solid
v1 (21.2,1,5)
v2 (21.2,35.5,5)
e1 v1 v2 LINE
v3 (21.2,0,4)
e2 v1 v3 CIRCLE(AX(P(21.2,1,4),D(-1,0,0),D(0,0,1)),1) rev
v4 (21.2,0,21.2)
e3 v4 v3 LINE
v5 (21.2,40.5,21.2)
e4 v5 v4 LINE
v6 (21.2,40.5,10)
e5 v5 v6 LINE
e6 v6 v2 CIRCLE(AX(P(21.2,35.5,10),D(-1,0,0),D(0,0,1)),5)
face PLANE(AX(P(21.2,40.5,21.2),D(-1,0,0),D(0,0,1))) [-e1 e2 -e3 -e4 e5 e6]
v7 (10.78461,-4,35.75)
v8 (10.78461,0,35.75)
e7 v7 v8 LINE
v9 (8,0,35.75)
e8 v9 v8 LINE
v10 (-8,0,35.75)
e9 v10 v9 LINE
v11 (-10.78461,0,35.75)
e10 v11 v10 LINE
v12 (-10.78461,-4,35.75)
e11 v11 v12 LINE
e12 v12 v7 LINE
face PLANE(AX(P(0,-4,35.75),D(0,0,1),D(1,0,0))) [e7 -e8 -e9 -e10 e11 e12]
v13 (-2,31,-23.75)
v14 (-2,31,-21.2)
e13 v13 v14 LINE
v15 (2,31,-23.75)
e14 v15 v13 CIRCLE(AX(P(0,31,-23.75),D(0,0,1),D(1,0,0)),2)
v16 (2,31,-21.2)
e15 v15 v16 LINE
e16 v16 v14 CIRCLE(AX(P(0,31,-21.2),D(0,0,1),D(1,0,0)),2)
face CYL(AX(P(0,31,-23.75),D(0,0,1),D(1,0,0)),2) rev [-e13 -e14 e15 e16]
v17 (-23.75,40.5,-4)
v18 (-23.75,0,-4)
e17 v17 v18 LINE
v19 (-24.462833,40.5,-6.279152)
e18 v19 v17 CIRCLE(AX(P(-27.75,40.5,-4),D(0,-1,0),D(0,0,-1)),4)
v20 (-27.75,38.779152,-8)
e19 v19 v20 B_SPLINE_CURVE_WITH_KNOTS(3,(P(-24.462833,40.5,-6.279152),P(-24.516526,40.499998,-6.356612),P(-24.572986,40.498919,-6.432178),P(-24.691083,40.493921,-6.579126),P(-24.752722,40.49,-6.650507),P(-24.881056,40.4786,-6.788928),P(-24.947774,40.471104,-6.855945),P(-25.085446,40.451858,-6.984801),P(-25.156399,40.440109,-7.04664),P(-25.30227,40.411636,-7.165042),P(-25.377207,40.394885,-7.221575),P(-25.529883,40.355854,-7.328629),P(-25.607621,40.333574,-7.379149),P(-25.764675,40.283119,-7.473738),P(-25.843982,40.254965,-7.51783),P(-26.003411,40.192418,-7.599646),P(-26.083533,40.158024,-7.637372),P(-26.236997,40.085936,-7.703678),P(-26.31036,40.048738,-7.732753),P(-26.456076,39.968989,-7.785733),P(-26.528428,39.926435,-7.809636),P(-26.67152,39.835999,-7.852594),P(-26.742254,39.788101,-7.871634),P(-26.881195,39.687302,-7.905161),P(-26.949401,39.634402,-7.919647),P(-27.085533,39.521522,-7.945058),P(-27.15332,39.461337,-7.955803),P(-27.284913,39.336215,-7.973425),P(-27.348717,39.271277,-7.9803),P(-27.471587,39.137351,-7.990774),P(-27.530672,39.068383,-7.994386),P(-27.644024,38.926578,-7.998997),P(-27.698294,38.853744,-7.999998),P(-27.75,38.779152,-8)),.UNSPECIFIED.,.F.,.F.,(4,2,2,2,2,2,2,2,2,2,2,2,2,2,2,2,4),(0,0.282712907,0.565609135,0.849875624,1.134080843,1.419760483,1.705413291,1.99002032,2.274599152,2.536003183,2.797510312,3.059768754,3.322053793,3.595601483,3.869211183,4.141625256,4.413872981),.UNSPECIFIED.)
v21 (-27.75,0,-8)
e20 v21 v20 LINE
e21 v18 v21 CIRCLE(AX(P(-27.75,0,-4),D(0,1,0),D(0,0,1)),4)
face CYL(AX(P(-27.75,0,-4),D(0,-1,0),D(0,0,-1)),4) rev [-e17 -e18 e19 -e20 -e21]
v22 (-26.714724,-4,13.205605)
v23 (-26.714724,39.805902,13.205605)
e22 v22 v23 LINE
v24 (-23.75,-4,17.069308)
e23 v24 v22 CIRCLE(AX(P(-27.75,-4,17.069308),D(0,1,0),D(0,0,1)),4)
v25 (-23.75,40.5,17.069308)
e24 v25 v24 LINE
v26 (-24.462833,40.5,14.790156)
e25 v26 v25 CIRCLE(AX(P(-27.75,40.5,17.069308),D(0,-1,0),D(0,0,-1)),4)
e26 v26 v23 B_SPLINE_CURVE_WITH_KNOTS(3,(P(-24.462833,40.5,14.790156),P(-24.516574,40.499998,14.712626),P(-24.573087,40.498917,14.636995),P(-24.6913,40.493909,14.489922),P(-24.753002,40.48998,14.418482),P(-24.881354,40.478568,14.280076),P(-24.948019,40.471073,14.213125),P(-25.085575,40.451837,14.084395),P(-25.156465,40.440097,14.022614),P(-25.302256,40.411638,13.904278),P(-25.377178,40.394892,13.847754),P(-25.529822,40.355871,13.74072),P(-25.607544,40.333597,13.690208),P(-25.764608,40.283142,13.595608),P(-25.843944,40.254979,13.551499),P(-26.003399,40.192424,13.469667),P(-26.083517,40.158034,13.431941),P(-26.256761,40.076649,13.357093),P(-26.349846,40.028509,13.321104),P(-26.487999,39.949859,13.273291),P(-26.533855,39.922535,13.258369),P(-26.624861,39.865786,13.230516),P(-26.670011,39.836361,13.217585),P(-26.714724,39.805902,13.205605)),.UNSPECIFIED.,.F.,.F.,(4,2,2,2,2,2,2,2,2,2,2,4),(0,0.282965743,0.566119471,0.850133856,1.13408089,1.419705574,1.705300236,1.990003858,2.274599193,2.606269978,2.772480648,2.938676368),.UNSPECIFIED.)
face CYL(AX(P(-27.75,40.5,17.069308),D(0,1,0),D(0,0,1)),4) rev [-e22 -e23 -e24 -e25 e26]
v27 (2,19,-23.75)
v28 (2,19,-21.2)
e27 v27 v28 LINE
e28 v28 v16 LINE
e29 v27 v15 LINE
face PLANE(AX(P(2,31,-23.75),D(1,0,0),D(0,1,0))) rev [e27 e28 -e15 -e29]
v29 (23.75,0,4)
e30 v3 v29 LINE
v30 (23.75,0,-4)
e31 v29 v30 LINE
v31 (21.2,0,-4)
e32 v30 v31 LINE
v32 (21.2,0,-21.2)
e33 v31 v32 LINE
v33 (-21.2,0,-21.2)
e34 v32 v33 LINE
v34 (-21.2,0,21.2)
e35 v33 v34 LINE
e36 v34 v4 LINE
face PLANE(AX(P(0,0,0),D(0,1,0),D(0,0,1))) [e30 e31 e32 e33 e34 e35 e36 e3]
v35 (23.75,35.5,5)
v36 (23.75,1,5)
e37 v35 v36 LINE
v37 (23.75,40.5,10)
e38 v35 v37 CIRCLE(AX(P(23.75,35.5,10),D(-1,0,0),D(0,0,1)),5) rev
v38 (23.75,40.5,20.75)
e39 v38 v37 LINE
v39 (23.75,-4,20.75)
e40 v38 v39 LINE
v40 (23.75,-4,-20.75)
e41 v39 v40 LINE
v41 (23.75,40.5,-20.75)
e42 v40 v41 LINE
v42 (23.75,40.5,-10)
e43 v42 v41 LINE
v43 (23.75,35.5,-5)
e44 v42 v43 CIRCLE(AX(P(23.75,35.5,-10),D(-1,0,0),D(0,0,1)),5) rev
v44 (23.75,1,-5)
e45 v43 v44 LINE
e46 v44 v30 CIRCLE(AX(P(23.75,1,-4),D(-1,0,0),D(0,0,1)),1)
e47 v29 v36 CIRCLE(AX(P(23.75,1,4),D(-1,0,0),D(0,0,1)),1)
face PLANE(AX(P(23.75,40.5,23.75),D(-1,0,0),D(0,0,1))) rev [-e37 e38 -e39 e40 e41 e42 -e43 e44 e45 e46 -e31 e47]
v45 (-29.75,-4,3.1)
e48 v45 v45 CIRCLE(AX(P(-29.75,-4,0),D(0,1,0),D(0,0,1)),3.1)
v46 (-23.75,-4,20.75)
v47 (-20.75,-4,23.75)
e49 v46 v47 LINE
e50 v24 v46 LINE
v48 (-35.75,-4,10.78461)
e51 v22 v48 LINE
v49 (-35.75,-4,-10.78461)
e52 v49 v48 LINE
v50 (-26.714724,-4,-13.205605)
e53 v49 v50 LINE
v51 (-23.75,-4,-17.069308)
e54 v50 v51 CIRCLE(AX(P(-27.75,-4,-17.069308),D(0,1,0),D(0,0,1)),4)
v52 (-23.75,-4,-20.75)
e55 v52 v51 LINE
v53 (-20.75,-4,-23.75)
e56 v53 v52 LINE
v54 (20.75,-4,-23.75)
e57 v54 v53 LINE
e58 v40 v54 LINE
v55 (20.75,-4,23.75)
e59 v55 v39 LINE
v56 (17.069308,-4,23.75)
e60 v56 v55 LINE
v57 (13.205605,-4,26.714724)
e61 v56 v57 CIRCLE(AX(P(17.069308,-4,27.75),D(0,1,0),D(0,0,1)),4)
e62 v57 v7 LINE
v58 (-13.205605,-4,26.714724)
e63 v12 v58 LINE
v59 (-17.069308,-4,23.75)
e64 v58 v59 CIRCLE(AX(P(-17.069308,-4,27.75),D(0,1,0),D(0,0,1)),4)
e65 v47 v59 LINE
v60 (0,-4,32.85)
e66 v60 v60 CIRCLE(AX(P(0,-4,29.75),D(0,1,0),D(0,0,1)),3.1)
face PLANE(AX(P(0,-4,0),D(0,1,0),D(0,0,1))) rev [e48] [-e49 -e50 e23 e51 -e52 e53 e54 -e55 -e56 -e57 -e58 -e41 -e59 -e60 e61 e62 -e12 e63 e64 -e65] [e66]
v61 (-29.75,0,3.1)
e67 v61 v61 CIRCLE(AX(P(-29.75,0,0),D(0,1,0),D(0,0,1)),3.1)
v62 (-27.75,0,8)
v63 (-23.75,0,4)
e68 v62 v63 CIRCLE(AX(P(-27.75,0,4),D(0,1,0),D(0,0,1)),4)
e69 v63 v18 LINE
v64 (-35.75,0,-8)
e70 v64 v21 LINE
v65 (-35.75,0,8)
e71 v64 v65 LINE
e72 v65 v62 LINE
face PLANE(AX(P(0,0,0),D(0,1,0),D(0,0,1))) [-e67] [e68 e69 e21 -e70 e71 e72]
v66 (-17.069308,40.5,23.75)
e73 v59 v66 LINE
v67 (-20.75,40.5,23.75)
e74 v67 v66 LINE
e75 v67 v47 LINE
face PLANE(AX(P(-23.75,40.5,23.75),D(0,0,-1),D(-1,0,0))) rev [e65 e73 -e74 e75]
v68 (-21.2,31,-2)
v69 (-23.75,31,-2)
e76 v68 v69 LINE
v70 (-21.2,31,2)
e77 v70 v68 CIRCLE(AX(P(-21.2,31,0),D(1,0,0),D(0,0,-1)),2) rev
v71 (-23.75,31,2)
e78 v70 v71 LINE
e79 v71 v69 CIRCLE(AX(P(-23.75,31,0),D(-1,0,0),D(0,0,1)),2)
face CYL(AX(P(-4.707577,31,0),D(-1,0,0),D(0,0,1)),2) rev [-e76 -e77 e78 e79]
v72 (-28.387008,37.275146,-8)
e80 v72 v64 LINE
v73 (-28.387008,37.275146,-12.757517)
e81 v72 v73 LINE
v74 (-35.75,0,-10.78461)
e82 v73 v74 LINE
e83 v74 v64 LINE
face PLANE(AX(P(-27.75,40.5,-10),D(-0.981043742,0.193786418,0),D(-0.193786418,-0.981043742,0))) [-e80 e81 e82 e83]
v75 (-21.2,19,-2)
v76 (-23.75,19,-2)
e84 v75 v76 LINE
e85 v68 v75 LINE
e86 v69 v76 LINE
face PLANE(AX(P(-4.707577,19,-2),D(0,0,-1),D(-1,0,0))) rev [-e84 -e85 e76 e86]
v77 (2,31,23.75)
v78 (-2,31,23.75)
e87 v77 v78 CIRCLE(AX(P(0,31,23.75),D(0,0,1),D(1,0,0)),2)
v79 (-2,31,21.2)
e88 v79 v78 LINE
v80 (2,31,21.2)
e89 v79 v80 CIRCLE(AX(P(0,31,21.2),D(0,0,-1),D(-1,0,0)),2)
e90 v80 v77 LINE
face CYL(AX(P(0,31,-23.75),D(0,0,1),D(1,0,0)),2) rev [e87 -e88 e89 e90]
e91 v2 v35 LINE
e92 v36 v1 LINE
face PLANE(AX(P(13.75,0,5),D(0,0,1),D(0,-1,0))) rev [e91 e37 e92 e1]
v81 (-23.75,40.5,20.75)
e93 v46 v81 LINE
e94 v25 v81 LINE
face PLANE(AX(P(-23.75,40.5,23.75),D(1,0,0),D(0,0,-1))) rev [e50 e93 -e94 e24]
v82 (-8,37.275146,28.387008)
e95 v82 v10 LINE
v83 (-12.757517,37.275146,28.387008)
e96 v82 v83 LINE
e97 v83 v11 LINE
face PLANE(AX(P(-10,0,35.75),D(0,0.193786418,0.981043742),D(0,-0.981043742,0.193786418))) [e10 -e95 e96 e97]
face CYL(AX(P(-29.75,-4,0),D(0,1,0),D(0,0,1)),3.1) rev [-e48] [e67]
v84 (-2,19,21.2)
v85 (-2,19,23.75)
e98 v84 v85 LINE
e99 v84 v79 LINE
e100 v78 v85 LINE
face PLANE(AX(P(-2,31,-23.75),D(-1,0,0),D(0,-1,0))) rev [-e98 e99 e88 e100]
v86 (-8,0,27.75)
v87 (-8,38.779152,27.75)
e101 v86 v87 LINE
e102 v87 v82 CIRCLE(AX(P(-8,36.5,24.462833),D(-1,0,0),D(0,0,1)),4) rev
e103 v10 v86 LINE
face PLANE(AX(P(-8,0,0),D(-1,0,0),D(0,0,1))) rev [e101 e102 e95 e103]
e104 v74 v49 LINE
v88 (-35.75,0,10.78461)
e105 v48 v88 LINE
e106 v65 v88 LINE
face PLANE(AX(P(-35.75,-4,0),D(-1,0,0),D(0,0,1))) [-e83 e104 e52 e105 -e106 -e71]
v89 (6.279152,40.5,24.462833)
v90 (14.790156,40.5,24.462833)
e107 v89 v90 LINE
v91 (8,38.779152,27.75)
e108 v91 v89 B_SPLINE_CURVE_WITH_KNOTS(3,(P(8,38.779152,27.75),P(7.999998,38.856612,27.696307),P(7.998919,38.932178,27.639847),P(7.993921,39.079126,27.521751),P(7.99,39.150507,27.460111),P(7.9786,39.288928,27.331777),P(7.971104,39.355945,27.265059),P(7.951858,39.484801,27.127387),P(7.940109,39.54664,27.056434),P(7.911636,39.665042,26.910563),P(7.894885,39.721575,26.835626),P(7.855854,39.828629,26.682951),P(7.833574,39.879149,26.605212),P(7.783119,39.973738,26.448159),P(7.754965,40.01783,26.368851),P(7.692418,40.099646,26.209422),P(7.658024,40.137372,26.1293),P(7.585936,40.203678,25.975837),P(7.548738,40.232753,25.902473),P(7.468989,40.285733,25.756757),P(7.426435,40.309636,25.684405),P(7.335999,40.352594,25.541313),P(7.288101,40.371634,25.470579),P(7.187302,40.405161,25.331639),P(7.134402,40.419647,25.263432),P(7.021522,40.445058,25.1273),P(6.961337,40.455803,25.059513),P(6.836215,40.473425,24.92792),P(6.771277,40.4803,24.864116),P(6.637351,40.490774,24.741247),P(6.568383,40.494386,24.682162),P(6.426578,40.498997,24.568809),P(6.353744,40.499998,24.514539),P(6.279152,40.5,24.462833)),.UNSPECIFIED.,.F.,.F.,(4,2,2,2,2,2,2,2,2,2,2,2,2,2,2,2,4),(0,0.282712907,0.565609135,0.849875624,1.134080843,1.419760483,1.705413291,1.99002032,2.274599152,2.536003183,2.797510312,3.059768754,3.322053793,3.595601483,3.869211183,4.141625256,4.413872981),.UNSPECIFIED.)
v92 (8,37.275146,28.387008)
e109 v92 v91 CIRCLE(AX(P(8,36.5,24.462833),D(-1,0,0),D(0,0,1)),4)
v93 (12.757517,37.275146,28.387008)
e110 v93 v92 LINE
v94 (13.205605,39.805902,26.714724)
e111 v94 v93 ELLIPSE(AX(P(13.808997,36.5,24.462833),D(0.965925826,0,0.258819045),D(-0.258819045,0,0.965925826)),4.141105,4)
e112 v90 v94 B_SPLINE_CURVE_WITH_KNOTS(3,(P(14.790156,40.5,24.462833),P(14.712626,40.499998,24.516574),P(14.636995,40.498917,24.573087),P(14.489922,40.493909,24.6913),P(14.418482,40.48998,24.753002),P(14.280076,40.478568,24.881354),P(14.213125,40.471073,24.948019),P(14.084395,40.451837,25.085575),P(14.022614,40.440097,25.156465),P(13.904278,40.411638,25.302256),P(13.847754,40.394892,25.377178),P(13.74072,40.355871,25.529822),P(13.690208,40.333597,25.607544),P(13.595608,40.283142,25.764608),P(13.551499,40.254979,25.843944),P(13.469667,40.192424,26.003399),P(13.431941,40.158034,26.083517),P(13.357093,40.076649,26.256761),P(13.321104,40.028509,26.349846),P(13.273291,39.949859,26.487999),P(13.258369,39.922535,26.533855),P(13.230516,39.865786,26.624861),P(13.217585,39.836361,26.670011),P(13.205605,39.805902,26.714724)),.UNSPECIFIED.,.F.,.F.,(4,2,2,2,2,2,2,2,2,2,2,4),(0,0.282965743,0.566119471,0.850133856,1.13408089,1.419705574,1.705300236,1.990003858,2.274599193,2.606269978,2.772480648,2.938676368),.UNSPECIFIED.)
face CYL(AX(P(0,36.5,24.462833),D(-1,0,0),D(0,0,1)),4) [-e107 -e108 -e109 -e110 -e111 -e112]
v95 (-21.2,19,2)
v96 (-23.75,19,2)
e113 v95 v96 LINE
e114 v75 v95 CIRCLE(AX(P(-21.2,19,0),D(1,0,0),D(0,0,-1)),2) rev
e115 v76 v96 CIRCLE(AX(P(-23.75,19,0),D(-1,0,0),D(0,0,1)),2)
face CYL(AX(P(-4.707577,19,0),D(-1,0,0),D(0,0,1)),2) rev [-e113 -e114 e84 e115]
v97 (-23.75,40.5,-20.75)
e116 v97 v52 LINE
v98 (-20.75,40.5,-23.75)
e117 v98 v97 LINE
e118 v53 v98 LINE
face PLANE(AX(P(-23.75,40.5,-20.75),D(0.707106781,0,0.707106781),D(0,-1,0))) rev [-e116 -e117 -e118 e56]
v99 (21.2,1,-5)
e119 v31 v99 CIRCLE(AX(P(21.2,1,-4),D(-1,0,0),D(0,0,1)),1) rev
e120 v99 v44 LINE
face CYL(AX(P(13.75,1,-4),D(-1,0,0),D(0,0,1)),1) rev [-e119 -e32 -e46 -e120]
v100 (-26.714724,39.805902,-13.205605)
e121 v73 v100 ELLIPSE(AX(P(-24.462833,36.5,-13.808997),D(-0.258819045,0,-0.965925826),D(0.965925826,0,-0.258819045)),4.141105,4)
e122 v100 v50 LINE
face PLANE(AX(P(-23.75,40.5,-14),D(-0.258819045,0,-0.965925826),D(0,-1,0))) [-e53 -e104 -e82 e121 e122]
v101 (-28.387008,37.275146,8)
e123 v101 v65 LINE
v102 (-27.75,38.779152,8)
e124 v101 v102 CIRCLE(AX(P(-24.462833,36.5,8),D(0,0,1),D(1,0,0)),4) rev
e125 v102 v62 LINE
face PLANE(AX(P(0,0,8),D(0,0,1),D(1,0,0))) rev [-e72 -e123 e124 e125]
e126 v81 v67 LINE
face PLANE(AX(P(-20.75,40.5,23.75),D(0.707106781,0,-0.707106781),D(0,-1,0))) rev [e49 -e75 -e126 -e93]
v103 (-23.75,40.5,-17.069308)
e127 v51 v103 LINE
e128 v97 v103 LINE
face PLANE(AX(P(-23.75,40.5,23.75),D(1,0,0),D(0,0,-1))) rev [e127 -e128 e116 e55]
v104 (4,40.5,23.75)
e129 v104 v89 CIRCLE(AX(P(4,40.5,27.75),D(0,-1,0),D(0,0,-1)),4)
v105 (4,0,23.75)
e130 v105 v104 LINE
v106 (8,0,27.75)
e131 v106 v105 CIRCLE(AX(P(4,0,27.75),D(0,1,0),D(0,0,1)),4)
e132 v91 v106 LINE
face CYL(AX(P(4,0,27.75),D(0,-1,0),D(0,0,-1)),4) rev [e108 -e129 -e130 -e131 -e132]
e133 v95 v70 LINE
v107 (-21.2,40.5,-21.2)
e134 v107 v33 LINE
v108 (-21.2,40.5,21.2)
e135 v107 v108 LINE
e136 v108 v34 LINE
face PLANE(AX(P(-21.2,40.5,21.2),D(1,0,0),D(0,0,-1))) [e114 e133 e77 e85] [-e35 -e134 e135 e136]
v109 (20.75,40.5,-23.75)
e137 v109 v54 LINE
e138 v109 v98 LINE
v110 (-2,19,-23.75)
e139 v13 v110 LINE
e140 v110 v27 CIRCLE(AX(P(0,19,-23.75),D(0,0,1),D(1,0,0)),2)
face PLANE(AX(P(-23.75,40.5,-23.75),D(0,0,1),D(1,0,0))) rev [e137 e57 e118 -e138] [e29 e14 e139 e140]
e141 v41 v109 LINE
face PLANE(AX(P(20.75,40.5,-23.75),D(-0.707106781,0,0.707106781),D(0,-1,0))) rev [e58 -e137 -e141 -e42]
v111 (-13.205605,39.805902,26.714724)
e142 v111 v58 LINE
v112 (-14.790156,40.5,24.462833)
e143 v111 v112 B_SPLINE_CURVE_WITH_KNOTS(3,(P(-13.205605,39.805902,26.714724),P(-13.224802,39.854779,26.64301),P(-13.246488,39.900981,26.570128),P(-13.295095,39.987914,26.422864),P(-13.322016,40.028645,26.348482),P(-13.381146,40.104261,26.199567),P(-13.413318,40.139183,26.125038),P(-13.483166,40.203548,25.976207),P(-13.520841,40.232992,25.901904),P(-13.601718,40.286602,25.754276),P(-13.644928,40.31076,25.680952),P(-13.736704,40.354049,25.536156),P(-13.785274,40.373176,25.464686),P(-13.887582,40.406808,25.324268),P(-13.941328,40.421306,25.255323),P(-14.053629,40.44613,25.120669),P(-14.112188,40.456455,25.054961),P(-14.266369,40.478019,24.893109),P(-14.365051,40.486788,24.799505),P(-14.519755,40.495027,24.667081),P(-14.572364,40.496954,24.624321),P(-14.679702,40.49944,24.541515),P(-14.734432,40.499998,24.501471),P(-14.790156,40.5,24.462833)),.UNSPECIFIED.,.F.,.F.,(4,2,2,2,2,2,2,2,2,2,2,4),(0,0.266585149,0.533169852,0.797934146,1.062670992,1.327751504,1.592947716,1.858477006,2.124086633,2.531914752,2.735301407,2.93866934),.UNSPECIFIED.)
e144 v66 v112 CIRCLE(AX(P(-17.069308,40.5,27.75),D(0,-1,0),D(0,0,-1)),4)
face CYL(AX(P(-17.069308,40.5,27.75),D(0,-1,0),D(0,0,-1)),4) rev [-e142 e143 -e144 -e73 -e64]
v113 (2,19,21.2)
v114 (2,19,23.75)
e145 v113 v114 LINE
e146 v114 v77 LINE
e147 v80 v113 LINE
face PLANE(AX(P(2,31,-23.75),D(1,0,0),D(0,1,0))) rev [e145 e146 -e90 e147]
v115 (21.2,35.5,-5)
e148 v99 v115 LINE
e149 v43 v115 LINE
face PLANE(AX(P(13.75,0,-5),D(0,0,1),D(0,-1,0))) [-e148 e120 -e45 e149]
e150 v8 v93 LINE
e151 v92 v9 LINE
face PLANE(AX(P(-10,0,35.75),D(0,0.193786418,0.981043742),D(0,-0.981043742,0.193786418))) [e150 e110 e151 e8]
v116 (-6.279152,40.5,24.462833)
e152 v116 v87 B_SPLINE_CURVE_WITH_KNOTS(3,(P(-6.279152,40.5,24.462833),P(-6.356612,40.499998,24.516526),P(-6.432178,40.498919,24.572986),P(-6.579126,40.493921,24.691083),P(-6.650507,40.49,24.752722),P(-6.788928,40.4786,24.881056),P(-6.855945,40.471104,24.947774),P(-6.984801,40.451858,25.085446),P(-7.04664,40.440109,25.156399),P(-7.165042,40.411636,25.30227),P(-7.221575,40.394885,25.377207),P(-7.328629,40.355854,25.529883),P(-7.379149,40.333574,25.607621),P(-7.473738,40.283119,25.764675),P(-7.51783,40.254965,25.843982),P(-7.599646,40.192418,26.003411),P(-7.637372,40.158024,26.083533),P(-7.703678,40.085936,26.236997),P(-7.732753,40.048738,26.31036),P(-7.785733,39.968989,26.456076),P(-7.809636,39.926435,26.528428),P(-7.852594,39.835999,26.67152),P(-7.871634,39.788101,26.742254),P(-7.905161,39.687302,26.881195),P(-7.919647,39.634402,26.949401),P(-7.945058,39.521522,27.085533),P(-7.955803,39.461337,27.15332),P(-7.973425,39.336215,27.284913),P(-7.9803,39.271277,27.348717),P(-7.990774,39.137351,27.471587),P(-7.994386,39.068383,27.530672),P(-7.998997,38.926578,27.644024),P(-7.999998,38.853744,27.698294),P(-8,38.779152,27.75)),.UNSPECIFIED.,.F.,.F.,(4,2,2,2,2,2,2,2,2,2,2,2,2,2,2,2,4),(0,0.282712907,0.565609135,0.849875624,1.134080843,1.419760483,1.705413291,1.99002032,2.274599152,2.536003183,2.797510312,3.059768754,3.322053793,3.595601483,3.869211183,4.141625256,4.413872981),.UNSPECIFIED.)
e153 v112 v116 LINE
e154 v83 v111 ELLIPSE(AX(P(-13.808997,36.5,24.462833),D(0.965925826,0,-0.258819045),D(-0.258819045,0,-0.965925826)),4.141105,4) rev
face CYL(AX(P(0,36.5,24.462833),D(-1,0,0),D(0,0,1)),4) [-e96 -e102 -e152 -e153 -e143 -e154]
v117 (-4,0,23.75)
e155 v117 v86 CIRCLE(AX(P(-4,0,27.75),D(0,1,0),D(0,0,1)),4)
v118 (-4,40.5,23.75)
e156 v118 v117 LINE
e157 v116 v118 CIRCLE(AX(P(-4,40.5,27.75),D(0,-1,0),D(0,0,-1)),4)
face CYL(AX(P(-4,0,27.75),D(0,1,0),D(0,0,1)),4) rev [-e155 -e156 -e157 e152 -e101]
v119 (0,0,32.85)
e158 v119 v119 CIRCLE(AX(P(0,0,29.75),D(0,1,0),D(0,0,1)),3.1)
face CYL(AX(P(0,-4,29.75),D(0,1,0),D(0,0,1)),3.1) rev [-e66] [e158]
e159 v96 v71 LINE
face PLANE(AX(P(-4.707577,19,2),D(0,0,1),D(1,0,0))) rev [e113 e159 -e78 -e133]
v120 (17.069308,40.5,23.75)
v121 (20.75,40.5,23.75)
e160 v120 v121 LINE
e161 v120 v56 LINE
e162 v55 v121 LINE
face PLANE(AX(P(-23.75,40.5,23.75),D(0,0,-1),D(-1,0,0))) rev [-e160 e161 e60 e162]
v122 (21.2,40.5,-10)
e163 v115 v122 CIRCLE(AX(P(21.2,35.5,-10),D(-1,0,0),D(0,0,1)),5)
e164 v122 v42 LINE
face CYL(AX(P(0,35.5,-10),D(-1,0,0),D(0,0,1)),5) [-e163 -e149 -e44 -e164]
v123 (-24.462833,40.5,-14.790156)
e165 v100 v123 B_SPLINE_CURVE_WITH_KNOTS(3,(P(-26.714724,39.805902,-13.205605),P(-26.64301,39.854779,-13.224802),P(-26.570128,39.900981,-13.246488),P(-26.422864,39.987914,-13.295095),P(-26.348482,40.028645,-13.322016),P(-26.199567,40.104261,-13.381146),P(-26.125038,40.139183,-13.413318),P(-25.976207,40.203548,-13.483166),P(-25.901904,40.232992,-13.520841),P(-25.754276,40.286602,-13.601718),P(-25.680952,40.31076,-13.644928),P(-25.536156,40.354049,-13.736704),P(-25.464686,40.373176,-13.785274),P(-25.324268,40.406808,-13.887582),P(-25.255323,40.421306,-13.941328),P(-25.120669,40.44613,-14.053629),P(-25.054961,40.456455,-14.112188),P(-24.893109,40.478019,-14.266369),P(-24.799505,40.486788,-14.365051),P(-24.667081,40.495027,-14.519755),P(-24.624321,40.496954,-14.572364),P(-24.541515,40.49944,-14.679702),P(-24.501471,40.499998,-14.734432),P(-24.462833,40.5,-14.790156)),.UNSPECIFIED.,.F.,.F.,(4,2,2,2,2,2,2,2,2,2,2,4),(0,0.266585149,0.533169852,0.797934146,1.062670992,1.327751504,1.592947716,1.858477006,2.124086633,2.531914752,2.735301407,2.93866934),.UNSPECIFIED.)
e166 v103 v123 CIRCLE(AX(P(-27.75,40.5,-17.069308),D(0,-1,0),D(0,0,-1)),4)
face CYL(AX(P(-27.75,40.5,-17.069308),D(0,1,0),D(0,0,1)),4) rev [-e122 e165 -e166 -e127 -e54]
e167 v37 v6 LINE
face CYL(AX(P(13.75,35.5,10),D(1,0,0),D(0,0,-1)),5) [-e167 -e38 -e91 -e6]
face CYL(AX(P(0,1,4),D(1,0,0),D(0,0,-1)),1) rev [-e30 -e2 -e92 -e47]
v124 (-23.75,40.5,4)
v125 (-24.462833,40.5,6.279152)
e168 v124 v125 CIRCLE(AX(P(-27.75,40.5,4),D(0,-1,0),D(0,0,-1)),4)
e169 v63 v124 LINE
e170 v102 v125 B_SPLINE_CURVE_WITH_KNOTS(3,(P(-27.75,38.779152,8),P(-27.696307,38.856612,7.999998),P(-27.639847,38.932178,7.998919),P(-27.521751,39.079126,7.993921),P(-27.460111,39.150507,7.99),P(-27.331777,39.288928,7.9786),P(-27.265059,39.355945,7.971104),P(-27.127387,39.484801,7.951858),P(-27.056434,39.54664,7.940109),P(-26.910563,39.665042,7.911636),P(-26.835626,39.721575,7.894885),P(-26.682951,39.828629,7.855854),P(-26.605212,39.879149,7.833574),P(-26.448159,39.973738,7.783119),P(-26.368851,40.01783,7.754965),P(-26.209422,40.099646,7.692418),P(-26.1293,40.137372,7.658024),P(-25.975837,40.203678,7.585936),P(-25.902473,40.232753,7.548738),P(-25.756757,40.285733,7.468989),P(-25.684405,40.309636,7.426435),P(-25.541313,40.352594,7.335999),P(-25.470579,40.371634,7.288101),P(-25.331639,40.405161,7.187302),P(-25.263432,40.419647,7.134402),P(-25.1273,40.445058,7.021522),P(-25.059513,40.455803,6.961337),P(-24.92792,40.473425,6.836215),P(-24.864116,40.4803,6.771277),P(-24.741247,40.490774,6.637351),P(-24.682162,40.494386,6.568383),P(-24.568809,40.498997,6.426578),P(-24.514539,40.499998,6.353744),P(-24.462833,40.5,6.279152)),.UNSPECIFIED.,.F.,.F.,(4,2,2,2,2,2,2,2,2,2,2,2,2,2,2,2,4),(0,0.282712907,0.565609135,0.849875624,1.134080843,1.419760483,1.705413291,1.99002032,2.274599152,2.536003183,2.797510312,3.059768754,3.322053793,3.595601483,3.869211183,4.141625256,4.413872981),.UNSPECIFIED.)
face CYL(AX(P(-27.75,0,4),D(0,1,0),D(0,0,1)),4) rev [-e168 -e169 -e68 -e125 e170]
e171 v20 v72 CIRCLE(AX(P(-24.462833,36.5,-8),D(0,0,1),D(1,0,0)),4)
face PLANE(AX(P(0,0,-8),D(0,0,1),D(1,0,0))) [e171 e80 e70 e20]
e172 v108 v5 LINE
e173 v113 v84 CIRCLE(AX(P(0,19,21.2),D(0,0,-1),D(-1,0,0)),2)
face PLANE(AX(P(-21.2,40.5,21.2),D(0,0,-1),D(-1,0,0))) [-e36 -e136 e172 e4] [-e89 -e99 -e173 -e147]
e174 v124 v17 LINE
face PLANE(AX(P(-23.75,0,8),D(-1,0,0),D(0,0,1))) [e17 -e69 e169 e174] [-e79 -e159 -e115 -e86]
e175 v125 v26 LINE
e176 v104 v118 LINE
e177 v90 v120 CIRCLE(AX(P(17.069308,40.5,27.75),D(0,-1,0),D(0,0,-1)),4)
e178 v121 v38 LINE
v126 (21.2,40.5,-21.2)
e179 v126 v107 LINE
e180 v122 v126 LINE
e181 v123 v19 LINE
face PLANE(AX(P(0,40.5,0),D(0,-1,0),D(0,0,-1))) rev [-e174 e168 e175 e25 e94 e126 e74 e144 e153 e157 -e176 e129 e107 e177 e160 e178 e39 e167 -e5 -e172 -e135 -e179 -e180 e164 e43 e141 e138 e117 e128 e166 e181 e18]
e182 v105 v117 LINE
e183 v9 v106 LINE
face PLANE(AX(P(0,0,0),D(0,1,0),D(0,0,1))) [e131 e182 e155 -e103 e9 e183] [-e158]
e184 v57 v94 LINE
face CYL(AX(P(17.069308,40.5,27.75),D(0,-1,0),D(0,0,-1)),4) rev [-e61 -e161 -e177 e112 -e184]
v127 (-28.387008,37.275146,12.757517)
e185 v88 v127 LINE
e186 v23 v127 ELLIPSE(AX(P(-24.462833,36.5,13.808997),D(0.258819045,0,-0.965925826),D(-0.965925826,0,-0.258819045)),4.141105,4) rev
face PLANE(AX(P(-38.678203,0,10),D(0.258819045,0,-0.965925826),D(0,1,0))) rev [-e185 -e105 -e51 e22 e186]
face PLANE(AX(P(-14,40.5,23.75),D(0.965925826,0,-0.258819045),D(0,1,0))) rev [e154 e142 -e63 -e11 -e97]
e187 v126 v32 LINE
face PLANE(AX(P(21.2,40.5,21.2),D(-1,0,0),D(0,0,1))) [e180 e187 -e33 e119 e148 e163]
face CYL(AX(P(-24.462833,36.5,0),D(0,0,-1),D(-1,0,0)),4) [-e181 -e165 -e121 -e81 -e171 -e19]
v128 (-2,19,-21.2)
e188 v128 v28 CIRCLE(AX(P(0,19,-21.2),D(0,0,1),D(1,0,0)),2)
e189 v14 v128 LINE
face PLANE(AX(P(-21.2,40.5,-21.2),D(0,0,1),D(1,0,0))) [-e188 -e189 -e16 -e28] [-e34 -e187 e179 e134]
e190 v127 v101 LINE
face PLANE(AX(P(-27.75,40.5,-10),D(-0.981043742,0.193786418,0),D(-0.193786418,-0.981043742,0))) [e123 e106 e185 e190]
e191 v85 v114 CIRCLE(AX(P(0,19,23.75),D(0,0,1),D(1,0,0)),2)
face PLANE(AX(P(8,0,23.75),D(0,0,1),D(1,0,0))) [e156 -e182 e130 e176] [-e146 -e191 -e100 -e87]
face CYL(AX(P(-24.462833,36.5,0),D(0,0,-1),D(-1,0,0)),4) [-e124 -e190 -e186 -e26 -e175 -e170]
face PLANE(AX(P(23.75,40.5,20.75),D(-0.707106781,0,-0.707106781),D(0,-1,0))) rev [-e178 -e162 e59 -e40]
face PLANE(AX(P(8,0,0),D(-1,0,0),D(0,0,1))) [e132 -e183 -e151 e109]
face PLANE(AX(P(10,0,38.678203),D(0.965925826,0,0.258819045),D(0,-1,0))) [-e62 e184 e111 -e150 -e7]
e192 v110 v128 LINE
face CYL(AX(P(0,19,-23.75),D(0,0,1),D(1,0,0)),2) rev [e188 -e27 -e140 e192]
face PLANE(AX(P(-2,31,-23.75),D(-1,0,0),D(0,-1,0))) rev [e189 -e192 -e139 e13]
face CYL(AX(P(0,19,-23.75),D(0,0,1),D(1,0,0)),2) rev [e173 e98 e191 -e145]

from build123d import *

# Parameters (mm, degrees)
SKETCH1_W                = 47.5
SKETCH1_H                = 47.5
SKETCH1_W_2              = 42.4
SKETCH1_H_2              = 42.4
BOSS_EXTRUDE1_DEPTH      = 40.5
FILLET1_SIZE             = 3
BOSS_EXTRUDE3_DEPTH      = 10
BOSS_EXTRUDE3_DEPTH_BACK = 10
CUT_EXTRUDE1_DEPTH       = 8
CUT_EXTRUDE1_DEPTH_BACK  = 8
BOSS_EXTRUDE4_DEPTH      = 10
BOSS_EXTRUDE4_DEPTH_BACK = 10
CUT_EXTRUDE2_DEPTH       = 8
CUT_EXTRUDE2_DEPTH_BACK  = 8
BOSS_EXTRUDE6_DEPTH      = 4
SKETCH10_R               = 3.1
CUT_EXTRUDE3_DEPTH       = 65.779433465
SKETCH11_R               = 3.1
CUT_EXTRUDE4_DEPTH       = 65.779433465
SKETCH14_W               = 5
SKETCH14_H               = 40.5
CUT_EXTRUDE6_DEPTH       = 10
FILLET9_R                = 5
FILLET10_R               = 1
CUT_EXTRUDE7_DEPTH       = 2.55
CUT_EXTRUDE8_DEPTH       = 72.93443195
CHAMFER1_SIZE            = 4
CHAMFER1_SIZE_2          = 14.92820323
CHAMFER2_SIZE            = 4
CHAMFER2_SIZE_2          = 14.92820323
CHAMFER3_SIZE            = 4
CHAMFER3_SIZE_2          = 14.92820323
FILLET16_R               = 4
FILLET17_R               = 4


with BuildPart() as part:
    # Sketch1 → Boss-Extrude1 (new body)
    with BuildSketch(Plane(origin=(0, 0, 0), x_dir=(1, 0, 0), z_dir=(0, 1, 0))):
        Rectangle(SKETCH1_W, SKETCH1_H)
        Rectangle(SKETCH1_W_2, SKETCH1_H_2, mode=Mode.SUBTRACT)
    extrude(amount=BOSS_EXTRUDE1_DEPTH)

    # Fillet1
    fillet1_edges = [part.edges().sort_by_distance(p)[0] for p in [
        (23.75, 20.25, 23.75),
        (-23.75, 20.25, 23.75),
        (-23.75, 20.25, -23.75),
        (23.75, 20.25, -23.75),
    ]]
    chamfer(fillet1_edges, length=FILLET1_SIZE)

    # Sketch3 → Boss-Extrude3 (add, two sides: drawn at the far end of the back side and taken through both)
    with BuildSketch(Plane.XY.offset(-BOSS_EXTRUDE3_DEPTH_BACK)):
        Polygon((-23.75, 0), (-23.75, 40.5), (-27.75, 40.5), (-35.75, 0), align=None)
    extrude(amount=BOSS_EXTRUDE3_DEPTH + BOSS_EXTRUDE3_DEPTH_BACK)

    # Sketch4 → Cut-Extrude1 (cut, two sides: drawn at the far end of the back side and taken through both)
    with BuildSketch(Plane.XY.offset(-CUT_EXTRUDE1_DEPTH_BACK)):
        Polygon((-35.75, 0), (-23.75, 0), (-23.75, 40.5), (-27.75, 40.5), align=None)
    extrude(amount=CUT_EXTRUDE1_DEPTH + CUT_EXTRUDE1_DEPTH_BACK, mode=Mode.SUBTRACT)

    # Sketch7 → Boss-Extrude4 (add, two sides: drawn at the far end of the back side and taken through both)
    with BuildSketch(Plane(origin=(0, 0, 0), x_dir=(0, 0, -1), z_dir=(1, 0, 0)).offset(-BOSS_EXTRUDE4_DEPTH_BACK)):
        Polygon((-35.75, 0), (-23.75, 0), (-23.75, 40.5), (-27.75, 40.5), align=None)
    extrude(amount=BOSS_EXTRUDE4_DEPTH + BOSS_EXTRUDE4_DEPTH_BACK)

    # Sketch8 → Cut-Extrude2 (cut, two sides: drawn at the far end of the back side and taken through both)
    with BuildSketch(Plane(origin=(0, 0, 0), x_dir=(0, 0, -1), z_dir=(1, 0, 0)).offset(-CUT_EXTRUDE2_DEPTH_BACK)):
        Polygon((-23.75, 0), (-23.75, 40.5), (-27.75, 40.5), (-35.75, 0), align=None)
    extrude(amount=CUT_EXTRUDE2_DEPTH + CUT_EXTRUDE2_DEPTH_BACK, mode=Mode.SUBTRACT)

    # Sketch9 → Boss-Extrude6 (add)
    with BuildSketch(Plane(origin=(0, 0, 0), x_dir=(1, 0, 0), z_dir=(0, 1, 0))):
        Polygon((-35.75, -10), (-23.75, -10), (-23.75, -20.75), (-20.75, -23.75), (-10, -23.75), (-10, -35.75), (10, -35.75), (10, -23.75), (20.75, -23.75), (23.75, -20.75), (23.75, 20.75), (20.75, 23.75), (-20.75, 23.75), (-23.75, 20.75), (-23.75, 10), (-35.75, 10), align=None)
    extrude(amount=-BOSS_EXTRUDE6_DEPTH)

    # Sketch10 → Cut-Extrude3 (cut, through all)
    with BuildSketch(Plane(origin=(0, 0, 0), x_dir=(1, 0, 0), z_dir=(0, 1, 0))):
        with Locations(Location((-29.75, 0, 0), (0, 0, 270))):
            Circle(SKETCH10_R)
    extrude(amount=-CUT_EXTRUDE3_DEPTH, mode=Mode.SUBTRACT)

    # Sketch11 → Cut-Extrude4 (cut, through all)
    with BuildSketch(Plane(origin=(0, 0, 0), x_dir=(1, 0, 0), z_dir=(0, 1, 0))):
        with Locations(Location((0, -29.75, 0), (0, 0, 270))):
            Circle(SKETCH11_R)
    extrude(amount=-CUT_EXTRUDE4_DEPTH, mode=Mode.SUBTRACT)

    # Sketch14 → Cut-Extrude6 (cut)
    with BuildSketch(Plane(origin=(23.75, 0, 0), x_dir=(0, 0, -1), z_dir=(1, 0, 0))):
        with Locations((-2.5, 20.25)):
            Rectangle(SKETCH14_W, SKETCH14_H)
        with Locations((2.5, 20.25)):
            Rectangle(SKETCH14_W, SKETCH14_H)
    extrude(amount=-CUT_EXTRUDE6_DEPTH, mode=Mode.SUBTRACT)

    # Fillet9
    fillet9_edges = [part.edges().sort_by_distance(p)[0] for p in [
        (22.475, 40.5, 5),
        (22.475, 40.5, -5),
    ]]
    fillet(fillet9_edges, radius=FILLET9_R)

    # Fillet10
    fillet10_edges = [part.edges().sort_by_distance(p)[0] for p in [
        (22.475, 0, -5),
        (22.475, 0, 5),
    ]]
    fillet(fillet10_edges, radius=FILLET10_R)

    # Sketch15 → Cut-Extrude7 (cut)
    with BuildSketch(Plane.ZY.offset(23.75)):
        with BuildLine():
            Line((-2, 19), (-2, 31))
            ThreePointArc((-2, 31), (0, 33), (2, 31))
            Line((2, 31), (2, 19))
            ThreePointArc((2, 19), (0, 17), (-2, 19))
        make_face()
    extrude(amount=-CUT_EXTRUDE7_DEPTH, mode=Mode.SUBTRACT)

    # Sketch16 → Cut-Extrude8 (cut, through all)
    with BuildSketch(Plane.XY.offset(23.75)):
        with BuildLine():
            Line((2, 31), (2, 19))
            ThreePointArc((2, 19), (0, 17), (-2, 19))
            Line((-2, 19), (-2, 31))
            ThreePointArc((-2, 31), (0, 33), (2, 31))
        make_face()
    extrude(amount=-CUT_EXTRUDE8_DEPTH, mode=Mode.SUBTRACT)

    # Chamfer1
    # the kernel refuses this chamfer: 14.92820323, 4 mm, written as the material it adds along each edge
    with BuildSketch(Plane(origin=(10, 40.5, 23.75), x_dir=(0.9905000388259542, 0, -0.13751244702129095), z_dir=(0, -1, 0))) as chamfer1_piece_1_section:
        Polygon((CHAMFER1_SIZE * 0.990500038826, CHAMFER1_SIZE * 0.137512447021), (-CHAMFER1_SIZE_2 * 0.137512447024, CHAMFER1_SIZE_2 * 0.990500038844), (0, 0), align=None)
    chamfer1_piece_1 = extrude(amount=44.5, mode=Mode.PRIVATE)
    chamfer1_piece_1 = split(chamfer1_piece_1, bisect_by=Plane(origin=(11.413878062, 16.831768276, 32.425206267), z_dir=(0, -0.19378641821299017, -0.9810437422032618)), keep=Keep.TOP, mode=Mode.PRIVATE)
    chamfer1_piece_1 = split(chamfer1_piece_1, bisect_by=Plane(origin=(11.413878062, 15.820324331, 35.75), z_dir=(0, 0, -1)), keep=Keep.TOP, mode=Mode.PRIVATE)
    add(chamfer1_piece_1)
    with BuildSketch(Plane(origin=(-23.75, 40.5, 10), x_dir=(-0.9999503267608394, 0, -0.009967146577156315), z_dir=(0, -1, 0))) as chamfer1_piece_2_section:
        Polygon((CHAMFER1_SIZE_2 * 0.999950326779, -CHAMFER1_SIZE_2 * 0.00996714657734), (-CHAMFER1_SIZE * 0.00996714657716, -CHAMFER1_SIZE * 0.999950326761), (0, 0), align=None)
    chamfer1_piece_2 = extrude(amount=44.5, mode=Mode.PRIVATE)
    chamfer1_piece_2 = split(chamfer1_piece_2, bisect_by=Plane(origin=(-32.425206267, 16.831768276, 11.413878062), z_dir=(0.9810437422032618, -0.19378641821299017, 0)), keep=Keep.TOP, mode=Mode.PRIVATE)
    chamfer1_piece_2 = split(chamfer1_piece_2, bisect_by=Plane(origin=(-35.75, 15.820324331, 11.413878062), z_dir=(1, 0, 0)), keep=Keep.TOP, mode=Mode.PRIVATE)
    add(chamfer1_piece_2)

    # Chamfer2
    # the kernel refuses this chamfer: 14.92820323, 4 mm, written as the material it adds along each edge
    with BuildSketch(Plane(origin=(-23.75, 40.5, -10), x_dir=(0.13751244702129095, 0, -0.9905000388259542), z_dir=(0, -1, 0))) as chamfer2_piece_1_section:
        Polygon((CHAMFER2_SIZE * 0.990500038826, -CHAMFER2_SIZE * 0.137512447021), (-CHAMFER2_SIZE_2 * 0.137512447024, -CHAMFER2_SIZE_2 * 0.990500038844), (0, 0), align=None)
    chamfer2_piece_1 = extrude(amount=44.5, mode=Mode.PRIVATE)
    chamfer2_piece_1 = split(chamfer2_piece_1, bisect_by=Plane(origin=(-32.425206267, 16.831768276, -11.413878062), z_dir=(0.9810437422032618, -0.19378641821299017, 0)), keep=Keep.TOP, mode=Mode.PRIVATE)
    chamfer2_piece_1 = split(chamfer2_piece_1, bisect_by=Plane(origin=(-35.75, 15.820324331, -11.413878062), z_dir=(1, 0, 0)), keep=Keep.TOP, mode=Mode.PRIVATE)
    add(chamfer2_piece_1)

    # Chamfer3
    # the kernel refuses this chamfer: 14.92820323, 4 mm, written as the material it adds along each edge
    with BuildSketch(Plane(origin=(-10, -4, 23.75), x_dir=(-0.9905000388259542, 0, -0.13751244702129095), z_dir=(0, 1, 0))) as chamfer3_piece_1_section:
        Polygon((CHAMFER3_SIZE * 0.990500038826, CHAMFER3_SIZE * 0.137512447021), (-CHAMFER3_SIZE_2 * 0.137512447024, CHAMFER3_SIZE_2 * 0.990500038844), (0, 0), align=None)
    chamfer3_piece_1 = extrude(amount=44.5, mode=Mode.PRIVATE)
    chamfer3_piece_1 = split(chamfer3_piece_1, bisect_by=Plane(origin=(-11.413878062, 16.831768276, 32.425206267), z_dir=(0, -0.19378641821299017, -0.9810437422032618)), keep=Keep.TOP, mode=Mode.PRIVATE)
    chamfer3_piece_1 = split(chamfer3_piece_1, bisect_by=Plane(origin=(-11.413878062, 15.820324331, 35.75), z_dir=(0, 0, -1)), keep=Keep.TOP, mode=Mode.PRIVATE)
    add(chamfer3_piece_1)

    # Fillet16
    fillet16_edges = [part.edges().sort_by_distance(p)[0] for p in [
        (-8, 20.25, 23.75),
        (8, 20.25, 23.75),
        (-23.75, 18.25, 14),
        (14, 18.25, 23.75),
        (-23.75, 18.25, -14),
        (-14, 18.25, 23.75),
        (-23.75, 20.25, -8),
        (-23.75, 20.25, 8),
    ]]
    fillet(fillet16_edges, radius=FILLET16_R)

    # Fillet17
    fillet17_edges = [part.edges().sort_by_distance(p)[0] for p in [
        (-27.75, 40.5, -10.464101615),
        (-27.75, 40.5, 10.464101615),
        (-10.464101615, 40.5, 27.75),
        (10.464101615, 40.5, 27.75),
    ]]
    fillet(fillet17_edges, radius=FILLET17_R)


solid = part.part
